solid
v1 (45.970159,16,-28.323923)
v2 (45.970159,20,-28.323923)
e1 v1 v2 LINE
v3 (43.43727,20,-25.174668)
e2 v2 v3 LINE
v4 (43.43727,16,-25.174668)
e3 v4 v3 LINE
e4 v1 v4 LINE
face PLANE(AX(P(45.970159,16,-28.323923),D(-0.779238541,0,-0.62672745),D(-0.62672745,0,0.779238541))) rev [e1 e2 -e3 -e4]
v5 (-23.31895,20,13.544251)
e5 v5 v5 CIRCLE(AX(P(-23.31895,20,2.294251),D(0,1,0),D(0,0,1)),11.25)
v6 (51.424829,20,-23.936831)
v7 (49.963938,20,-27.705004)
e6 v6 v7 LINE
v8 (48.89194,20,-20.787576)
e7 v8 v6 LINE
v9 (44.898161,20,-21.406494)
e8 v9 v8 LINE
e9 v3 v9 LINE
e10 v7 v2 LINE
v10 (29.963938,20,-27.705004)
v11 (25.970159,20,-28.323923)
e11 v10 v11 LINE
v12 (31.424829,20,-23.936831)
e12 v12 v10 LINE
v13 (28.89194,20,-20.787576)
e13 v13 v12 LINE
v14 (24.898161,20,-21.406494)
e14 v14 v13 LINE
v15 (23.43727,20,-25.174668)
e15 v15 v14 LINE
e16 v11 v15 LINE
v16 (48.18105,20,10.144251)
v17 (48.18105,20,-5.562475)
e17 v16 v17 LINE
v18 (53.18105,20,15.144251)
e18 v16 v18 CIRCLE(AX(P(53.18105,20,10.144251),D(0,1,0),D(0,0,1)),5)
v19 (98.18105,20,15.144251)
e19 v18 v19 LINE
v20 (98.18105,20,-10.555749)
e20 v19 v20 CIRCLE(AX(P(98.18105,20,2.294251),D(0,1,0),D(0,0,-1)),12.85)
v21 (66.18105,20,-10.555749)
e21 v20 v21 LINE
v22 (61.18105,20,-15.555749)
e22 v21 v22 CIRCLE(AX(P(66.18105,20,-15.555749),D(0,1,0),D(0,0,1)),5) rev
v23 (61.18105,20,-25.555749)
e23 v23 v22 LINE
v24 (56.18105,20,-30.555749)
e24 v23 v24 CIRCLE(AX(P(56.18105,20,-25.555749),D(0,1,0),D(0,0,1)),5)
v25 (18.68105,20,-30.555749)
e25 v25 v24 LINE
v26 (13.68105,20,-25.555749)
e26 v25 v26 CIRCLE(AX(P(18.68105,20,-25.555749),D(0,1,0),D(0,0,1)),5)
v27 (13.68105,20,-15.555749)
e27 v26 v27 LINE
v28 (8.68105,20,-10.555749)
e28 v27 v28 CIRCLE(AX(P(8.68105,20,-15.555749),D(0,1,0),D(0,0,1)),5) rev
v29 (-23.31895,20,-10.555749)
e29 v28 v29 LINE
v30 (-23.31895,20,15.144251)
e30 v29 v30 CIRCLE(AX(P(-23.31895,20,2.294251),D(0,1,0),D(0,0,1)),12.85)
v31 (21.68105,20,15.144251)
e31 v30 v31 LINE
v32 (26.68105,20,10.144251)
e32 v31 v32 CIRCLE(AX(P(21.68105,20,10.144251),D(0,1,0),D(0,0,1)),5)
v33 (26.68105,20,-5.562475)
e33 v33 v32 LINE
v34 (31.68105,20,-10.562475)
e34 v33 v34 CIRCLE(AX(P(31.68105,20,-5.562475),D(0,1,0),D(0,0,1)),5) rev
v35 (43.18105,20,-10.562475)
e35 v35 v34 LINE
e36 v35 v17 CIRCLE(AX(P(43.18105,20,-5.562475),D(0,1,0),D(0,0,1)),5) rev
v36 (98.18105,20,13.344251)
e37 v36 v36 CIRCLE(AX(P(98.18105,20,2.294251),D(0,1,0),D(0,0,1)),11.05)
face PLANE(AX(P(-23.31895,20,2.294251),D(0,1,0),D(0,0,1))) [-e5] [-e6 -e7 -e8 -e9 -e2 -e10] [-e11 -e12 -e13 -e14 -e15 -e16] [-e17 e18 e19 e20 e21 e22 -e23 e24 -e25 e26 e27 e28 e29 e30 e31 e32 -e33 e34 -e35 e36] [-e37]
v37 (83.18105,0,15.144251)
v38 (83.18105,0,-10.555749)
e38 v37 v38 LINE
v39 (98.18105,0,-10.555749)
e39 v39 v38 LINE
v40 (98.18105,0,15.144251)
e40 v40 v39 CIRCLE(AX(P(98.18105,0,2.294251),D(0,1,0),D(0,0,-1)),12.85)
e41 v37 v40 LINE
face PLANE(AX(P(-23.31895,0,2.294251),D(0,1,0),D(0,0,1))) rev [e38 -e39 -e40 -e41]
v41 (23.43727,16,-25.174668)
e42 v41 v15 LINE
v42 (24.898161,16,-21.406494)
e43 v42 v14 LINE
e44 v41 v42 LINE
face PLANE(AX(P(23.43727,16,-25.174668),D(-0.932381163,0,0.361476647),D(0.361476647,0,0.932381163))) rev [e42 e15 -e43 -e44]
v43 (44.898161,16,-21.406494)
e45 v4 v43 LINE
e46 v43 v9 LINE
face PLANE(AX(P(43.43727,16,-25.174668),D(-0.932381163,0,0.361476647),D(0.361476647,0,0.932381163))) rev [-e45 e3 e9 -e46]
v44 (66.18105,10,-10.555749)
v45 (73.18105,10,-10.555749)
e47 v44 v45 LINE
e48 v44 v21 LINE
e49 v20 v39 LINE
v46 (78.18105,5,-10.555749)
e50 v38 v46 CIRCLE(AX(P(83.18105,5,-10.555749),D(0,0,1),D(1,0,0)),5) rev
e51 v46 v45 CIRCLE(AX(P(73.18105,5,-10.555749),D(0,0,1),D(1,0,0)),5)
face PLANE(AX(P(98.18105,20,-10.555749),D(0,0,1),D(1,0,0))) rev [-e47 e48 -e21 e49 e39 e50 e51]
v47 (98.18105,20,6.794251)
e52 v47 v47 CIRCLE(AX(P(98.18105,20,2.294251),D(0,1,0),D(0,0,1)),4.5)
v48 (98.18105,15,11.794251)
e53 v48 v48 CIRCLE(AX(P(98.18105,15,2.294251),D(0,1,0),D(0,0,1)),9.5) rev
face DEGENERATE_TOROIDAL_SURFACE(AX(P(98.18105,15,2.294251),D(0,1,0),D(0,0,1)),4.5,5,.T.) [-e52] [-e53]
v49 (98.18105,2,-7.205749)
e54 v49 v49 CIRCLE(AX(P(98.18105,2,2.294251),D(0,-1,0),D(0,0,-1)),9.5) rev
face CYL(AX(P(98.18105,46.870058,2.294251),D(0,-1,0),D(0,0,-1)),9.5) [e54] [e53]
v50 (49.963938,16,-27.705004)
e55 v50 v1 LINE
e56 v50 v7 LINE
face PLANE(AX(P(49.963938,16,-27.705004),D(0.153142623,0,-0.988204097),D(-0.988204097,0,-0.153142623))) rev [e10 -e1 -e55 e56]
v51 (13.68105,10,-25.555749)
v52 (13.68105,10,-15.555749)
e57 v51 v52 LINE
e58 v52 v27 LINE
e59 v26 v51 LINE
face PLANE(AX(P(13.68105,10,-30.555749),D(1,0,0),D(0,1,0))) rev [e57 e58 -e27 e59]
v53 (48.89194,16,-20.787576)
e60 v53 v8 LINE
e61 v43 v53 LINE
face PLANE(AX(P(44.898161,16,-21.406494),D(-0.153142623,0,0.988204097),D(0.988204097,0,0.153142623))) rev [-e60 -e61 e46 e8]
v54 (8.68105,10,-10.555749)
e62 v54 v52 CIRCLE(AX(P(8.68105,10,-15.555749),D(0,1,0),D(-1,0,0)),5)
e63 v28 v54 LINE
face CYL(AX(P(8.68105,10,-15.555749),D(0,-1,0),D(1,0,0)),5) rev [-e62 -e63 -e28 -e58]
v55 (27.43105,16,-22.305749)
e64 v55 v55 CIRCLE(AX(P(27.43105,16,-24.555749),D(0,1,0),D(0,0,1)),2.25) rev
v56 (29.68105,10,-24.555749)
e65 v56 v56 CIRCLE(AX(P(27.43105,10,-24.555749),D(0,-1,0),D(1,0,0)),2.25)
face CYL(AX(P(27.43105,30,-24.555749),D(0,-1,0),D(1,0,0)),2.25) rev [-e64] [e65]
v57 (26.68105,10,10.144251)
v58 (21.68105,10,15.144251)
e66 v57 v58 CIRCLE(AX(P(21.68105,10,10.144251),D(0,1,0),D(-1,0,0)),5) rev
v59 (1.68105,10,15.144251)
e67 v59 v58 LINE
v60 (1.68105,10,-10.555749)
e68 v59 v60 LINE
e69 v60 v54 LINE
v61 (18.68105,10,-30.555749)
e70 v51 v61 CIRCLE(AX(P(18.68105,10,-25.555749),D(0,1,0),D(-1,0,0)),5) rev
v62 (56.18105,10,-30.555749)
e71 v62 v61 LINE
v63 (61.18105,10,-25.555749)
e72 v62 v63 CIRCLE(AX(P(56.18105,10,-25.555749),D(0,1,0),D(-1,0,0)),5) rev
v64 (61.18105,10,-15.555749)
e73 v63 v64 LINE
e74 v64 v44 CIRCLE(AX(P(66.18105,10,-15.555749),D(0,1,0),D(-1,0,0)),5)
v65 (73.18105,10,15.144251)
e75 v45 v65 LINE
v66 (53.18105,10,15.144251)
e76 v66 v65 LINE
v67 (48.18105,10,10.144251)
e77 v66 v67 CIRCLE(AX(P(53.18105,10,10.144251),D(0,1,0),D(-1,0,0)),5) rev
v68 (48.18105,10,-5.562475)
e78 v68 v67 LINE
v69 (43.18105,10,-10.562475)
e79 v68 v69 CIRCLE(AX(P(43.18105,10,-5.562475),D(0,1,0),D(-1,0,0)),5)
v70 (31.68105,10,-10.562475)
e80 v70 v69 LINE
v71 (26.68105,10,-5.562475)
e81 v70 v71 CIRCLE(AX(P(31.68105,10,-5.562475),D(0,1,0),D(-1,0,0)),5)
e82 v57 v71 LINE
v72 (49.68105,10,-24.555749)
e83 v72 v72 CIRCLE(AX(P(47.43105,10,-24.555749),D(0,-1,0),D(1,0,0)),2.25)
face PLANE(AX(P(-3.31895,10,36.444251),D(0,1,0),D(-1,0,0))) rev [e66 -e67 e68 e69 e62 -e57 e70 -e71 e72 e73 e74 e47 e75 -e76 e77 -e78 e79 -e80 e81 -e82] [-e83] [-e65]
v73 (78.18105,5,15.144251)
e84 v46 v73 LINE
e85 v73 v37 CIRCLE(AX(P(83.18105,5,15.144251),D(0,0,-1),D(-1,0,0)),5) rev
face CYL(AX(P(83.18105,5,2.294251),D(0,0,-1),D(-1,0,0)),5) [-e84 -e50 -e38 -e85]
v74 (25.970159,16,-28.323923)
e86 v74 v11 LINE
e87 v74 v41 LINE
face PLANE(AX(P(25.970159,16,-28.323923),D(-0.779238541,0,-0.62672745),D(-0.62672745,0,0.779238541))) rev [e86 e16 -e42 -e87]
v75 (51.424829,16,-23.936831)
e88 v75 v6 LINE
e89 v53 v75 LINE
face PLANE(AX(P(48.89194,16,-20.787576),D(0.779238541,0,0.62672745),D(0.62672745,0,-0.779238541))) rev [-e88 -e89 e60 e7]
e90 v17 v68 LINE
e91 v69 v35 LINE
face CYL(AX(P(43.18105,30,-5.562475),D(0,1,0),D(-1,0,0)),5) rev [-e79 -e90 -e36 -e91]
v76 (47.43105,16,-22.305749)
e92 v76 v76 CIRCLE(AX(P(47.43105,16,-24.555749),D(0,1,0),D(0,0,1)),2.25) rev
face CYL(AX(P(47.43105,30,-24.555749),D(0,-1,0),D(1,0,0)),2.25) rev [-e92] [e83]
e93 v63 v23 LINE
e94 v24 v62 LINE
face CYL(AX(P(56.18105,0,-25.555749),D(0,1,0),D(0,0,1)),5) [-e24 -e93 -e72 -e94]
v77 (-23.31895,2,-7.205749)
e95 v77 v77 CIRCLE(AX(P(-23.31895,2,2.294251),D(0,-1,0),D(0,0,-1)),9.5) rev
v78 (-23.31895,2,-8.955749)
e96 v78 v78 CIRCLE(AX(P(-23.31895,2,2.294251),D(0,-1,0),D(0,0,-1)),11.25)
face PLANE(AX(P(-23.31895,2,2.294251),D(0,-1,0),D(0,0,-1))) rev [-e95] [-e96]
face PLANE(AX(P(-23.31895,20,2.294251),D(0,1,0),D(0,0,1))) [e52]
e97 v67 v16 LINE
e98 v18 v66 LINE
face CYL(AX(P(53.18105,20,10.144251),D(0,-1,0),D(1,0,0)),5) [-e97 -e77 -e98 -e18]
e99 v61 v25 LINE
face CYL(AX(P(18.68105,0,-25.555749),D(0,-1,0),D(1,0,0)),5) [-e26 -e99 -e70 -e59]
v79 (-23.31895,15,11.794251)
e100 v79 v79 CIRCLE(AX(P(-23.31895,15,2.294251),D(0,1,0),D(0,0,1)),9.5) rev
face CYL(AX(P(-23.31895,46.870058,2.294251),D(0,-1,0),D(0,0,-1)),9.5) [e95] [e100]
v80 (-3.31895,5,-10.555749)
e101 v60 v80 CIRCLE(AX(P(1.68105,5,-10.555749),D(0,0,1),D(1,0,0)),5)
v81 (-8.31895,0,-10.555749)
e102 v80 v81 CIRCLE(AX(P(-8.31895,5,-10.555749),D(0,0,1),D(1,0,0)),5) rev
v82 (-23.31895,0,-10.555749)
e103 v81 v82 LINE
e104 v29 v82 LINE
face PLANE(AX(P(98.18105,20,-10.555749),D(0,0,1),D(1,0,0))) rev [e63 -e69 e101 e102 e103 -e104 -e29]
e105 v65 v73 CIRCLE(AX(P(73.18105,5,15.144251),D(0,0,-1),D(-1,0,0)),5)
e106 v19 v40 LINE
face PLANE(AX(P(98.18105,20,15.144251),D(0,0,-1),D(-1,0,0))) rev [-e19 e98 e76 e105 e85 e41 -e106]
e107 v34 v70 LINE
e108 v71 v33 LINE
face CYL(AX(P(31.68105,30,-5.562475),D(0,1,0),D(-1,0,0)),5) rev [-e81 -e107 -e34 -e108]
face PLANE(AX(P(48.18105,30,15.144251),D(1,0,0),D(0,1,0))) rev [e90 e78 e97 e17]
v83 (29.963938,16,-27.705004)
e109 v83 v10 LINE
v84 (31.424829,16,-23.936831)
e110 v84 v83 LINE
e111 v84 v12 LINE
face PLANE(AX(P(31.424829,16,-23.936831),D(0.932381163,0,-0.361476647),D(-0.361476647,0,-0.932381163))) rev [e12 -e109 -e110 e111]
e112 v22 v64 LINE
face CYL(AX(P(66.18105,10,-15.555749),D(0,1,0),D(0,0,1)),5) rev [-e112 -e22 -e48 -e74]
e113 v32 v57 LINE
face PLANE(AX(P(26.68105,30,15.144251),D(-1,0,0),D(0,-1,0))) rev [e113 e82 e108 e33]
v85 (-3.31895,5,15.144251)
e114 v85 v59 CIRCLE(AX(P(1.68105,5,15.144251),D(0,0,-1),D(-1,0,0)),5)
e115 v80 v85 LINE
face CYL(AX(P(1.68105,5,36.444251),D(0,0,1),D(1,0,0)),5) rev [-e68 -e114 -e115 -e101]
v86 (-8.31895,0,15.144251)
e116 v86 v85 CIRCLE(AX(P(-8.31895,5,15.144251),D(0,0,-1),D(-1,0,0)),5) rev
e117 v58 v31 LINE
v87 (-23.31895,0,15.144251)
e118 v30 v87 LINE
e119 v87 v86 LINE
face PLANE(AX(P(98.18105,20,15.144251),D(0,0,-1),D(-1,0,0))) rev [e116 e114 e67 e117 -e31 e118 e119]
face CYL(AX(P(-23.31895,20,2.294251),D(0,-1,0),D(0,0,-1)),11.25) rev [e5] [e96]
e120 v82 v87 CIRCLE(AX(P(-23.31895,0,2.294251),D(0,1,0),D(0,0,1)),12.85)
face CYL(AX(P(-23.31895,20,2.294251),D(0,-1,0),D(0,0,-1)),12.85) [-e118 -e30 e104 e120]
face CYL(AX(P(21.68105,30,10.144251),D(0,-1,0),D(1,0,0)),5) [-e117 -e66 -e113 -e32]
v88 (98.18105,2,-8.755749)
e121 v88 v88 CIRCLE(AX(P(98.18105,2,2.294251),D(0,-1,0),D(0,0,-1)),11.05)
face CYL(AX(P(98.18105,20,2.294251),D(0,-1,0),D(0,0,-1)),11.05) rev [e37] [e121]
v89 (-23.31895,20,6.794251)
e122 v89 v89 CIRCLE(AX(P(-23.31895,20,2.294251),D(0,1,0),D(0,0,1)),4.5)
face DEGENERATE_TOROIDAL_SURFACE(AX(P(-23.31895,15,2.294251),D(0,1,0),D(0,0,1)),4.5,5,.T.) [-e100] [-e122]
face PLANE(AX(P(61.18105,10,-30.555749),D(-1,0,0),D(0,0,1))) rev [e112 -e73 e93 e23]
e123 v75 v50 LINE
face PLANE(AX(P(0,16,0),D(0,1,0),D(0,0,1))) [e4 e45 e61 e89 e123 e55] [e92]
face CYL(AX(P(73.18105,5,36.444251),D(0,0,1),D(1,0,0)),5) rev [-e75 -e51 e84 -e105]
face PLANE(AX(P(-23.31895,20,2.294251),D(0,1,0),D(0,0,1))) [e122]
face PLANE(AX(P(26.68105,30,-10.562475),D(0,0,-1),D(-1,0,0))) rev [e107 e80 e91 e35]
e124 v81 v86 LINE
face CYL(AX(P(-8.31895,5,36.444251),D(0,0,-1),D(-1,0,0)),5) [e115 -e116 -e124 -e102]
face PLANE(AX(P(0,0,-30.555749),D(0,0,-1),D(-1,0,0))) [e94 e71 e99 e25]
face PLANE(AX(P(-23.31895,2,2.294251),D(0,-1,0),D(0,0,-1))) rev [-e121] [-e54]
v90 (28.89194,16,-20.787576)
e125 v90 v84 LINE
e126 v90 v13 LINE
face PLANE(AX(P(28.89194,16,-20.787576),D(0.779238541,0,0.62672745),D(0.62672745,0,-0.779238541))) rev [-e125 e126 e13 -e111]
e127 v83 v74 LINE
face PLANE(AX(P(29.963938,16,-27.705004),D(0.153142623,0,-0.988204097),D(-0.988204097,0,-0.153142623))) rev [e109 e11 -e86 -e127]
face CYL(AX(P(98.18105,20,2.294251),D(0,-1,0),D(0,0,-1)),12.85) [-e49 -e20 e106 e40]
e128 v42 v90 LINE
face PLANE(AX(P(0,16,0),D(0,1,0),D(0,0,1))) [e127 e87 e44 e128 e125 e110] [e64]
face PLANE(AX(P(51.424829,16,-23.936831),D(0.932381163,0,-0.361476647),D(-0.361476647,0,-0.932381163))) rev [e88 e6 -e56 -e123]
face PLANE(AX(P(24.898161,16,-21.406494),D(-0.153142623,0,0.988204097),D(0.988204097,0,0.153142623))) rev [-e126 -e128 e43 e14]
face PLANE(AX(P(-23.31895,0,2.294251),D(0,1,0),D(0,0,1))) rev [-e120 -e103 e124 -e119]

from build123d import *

# Parameters (mm, degrees)
SKETCH1_R           = 11.25
SKETCH1_R_2         = 11.05
BOSS_EXTRUDE1_DEPTH = 20
BOSS_EXTRUDE2_DEPTH = 2
SKETCH3_R           = 9.5
BOSS_EXTRUDE3_DEPTH = 18
SKETCH4_W           = 81.5
SKETCH4_H           = 10
CUT_EXTRUDE1_DEPTH  = 47
FILLET1_START       = -12
FILLET1_DEPTH       = 28
FILLET1_START_2     = -10.55574922
FILLET1_2_DEPTH     = 25.7
SKETCH5_W           = 47.5
SKETCH5_H           = 10
BOSS_EXTRUDE4_DEPTH = 20
FILLET2_R           = 5
SKETCH6_W           = 21.5
SKETCH6_H           = 25.70672576
CUT_EXTRUDE2_DEPTH  = 20
FILLET3_R           = 5
SKETCH7_R           = 2.25
CUT_EXTRUDE3_DEPTH  = 20
CUT_EXTRUDE4_DEPTH  = 4
FILLET4_R           = 5
FILLET5_R           = 5


with BuildPart() as part:
    # Sketch1 → Boss-Extrude1 (new body)
    with BuildSketch(Plane(origin=(0, 0, 0), x_dir=(1, 0, 0), z_dir=(0, 1, 0))):
        with BuildLine():
            Line((98.181049616, -15.14425078), (-23.318950384, -15.14425078))
            ThreePointArc((-23.318950384, -15.14425078), (-36.168950384, -2.29425078), (-23.318950384, 10.55574922))
            Line((-23.318950384, 10.55574922), (98.181049616, 10.55574922))
            ThreePointArc((98.181049616, 10.55574922), (111.031049616, -2.29425078), (98.181049616, -15.14425078))
        make_face()
        with Locations(Location((-23.318950384, -2.29425078, 0), (0, 0, 270))):
            Circle(SKETCH1_R, mode=Mode.SUBTRACT)
        with Locations(Location((98.181049616, -2.29425078, 0), (0, 0, 270))):
            Circle(SKETCH1_R_2, mode=Mode.SUBTRACT)
    extrude(amount=BOSS_EXTRUDE1_DEPTH)

    # Sketch2 → Boss-Extrude2 (add)
    with BuildSketch(Plane.XZ):
        with BuildLine():
            Line((-23.318950384, -10.55574922), (98.181049616, -10.55574922))
            ThreePointArc((98.181049616, -10.55574922), (111.031049616, 2.29425078), (98.181049616, 15.14425078))
            Line((98.181049616, 15.14425078), (-23.318950384, 15.14425078))
            ThreePointArc((-23.318950384, 15.14425078), (-36.168950384, 2.29425078), (-23.318950384, -10.55574922))
        make_face()
    extrude(amount=-BOSS_EXTRUDE2_DEPTH)

    # Sketch3 → Boss-Extrude3 (add)
    with BuildSketch(Plane(origin=(0, 2, 0), x_dir=(1, 0, 0), z_dir=(0, 1, 0))):
        with Locations(Location((-23.318950384, -2.29425078, 0), (0, 0, 90))):
            Circle(SKETCH3_R)
        with Locations(Location((98.181049616, -2.29425078, 0), (0, 0, 90))):
            Circle(SKETCH3_R)
    extrude(amount=BOSS_EXTRUDE3_DEPTH)

    # Sketch4 → Cut-Extrude1 (cut)
    with BuildSketch(Plane(origin=(0, 0, -10.55574922), x_dir=(-1, 0, 0), z_dir=(0, 0, -1))):
        with Locations((-37.431049616, 5)):
            Rectangle(SKETCH4_W, SKETCH4_H)
    extrude(amount=-CUT_EXTRUDE1_DEPTH, mode=Mode.SUBTRACT)

    # Fillet1: read off the stored shape, not the designer's step
    # Fillet1 outline → Fillet1 (cut)
    with BuildSketch(Plane.XY.offset(FILLET1_START)):
        with BuildLine():
            Line((-3.318950384, 0), (-3.318950384, 5))
            ThreePointArc((-3.318950384, 5), (-4.783416479, 1.464466094), (-8.318950384, 0))
            Line((-8.318950384, 0), (-3.318950384, 0))
        make_face()
        with BuildLine():
            ThreePointArc((83.181049616, 0), (79.64551571, 1.464466094), (78.181049616, 5))
            Line((78.181049616, 5), (78.181049616, 0))
            Line((78.181049616, 0), (83.181049616, 0))
        make_face()
    extrude(amount=FILLET1_DEPTH, mode=Mode.SUBTRACT)

    # Fillet1 2 outline → Fillet1 2 (add)
    with BuildSketch(Plane.XY.offset(FILLET1_START_2)):
        with BuildLine():
            Line((78.181049616, 10), (73.181049616, 10))
            ThreePointArc((73.181049616, 10), (76.716583521, 8.535533906), (78.181049616, 5))
            Line((78.181049616, 5), (78.181049616, 10))
        make_face()
        with BuildLine():
            ThreePointArc((-3.318950384, 5), (-1.85448429, 8.535533906), (1.681049616, 10))
            Line((1.681049616, 10), (-3.318950384, 10))
            Line((-3.318950384, 10), (-3.318950384, 5))
        make_face()
    extrude(amount=FILLET1_2_DEPTH)

    # Sketch5 → Boss-Extrude4 (add)
    with BuildSketch(Plane(origin=(0, 0, -10.55574922), x_dir=(-1, 0, 0), z_dir=(0, 0, -1))):
        with Locations((-37.431049616, 15)):
            Rectangle(SKETCH5_W, SKETCH5_H)
    extrude(amount=BOSS_EXTRUDE4_DEPTH)

    # Fillet2
    fillet2_edges = [part.edges().sort_by_distance(p)[0] for p in [
        (13.681049616, 15, -10.55574922),
        (61.181049616, 15, -10.55574922),
        (13.681049616, 15, -30.55574922),
        (61.181049616, 15, -30.55574922),
    ]]
    fillet(fillet2_edges, radius=FILLET2_R)

    # Sketch6 → Cut-Extrude2 (cut)
    with BuildSketch(Plane(origin=(0, 10, 0), x_dir=(-1, 0, 0), z_dir=(0, -1, 0))):
        with Locations((-37.431049616, -2.2908879)):
            Rectangle(SKETCH6_W, SKETCH6_H)
    extrude(amount=-CUT_EXTRUDE2_DEPTH, mode=Mode.SUBTRACT)

    # Fillet3
    fillet3_edges = [part.edges().sort_by_distance(p)[0] for p in [
        (26.681049616, 15, -10.56247498),
        (26.681049616, 15, 15.14425078),
        (48.181049616, 15, 15.14425078),
        (48.181049616, 15, -10.56247498),
    ]]
    fillet(fillet3_edges, radius=FILLET3_R)

    # Sketch7 → Cut-Extrude3 (cut)
    with BuildSketch(Plane(origin=(0, 10, 0), x_dir=(-1, 0, 0), z_dir=(0, -1, 0))):
        with Locations(Location((-27.431049616, 24.55574922, 0), (0, 0, 180))):
            Circle(SKETCH7_R)
        with Locations(Location((-47.431049616, 24.55574922, 0), (0, 0, 180))):
            Circle(SKETCH7_R)
    extrude(amount=-CUT_EXTRUDE3_DEPTH, mode=Mode.SUBTRACT)

    # Sketch8 → Cut-Extrude4 (cut)
    with BuildSketch(Plane(origin=(0, 20, 0), x_dir=(1, 0, 0), z_dir=(0, 1, 0))):
        Polygon((31.424828925, 23.936830678), (29.963938451, 27.705004288), (25.970159141, 28.32392283), (23.437270306, 25.174667762), (24.898160781, 21.406494152), (28.89194009, 20.78757561), align=None)
        Polygon((51.424828925, 23.936830678), (49.963938451, 27.705004288), (45.970159141, 28.32392283), (43.437270306, 25.174667762), (44.898160781, 21.406494152), (48.89194009, 20.78757561), align=None)
    extrude(amount=-CUT_EXTRUDE4_DEPTH, mode=Mode.SUBTRACT)

    # Fillet4
    fillet4_edges = [part.edges().sort_by_distance(p)[0] for p in [
        (-23.318950384, 20, 11.79425078),
    ]]
    fillet(fillet4_edges, radius=FILLET4_R)

    # Fillet5
    fillet5_edges = [part.edges().sort_by_distance(p)[0] for p in [
        (98.181049616, 20, 11.79425078),
    ]]
    fillet(fillet5_edges, radius=FILLET5_R)


solid = part.part
